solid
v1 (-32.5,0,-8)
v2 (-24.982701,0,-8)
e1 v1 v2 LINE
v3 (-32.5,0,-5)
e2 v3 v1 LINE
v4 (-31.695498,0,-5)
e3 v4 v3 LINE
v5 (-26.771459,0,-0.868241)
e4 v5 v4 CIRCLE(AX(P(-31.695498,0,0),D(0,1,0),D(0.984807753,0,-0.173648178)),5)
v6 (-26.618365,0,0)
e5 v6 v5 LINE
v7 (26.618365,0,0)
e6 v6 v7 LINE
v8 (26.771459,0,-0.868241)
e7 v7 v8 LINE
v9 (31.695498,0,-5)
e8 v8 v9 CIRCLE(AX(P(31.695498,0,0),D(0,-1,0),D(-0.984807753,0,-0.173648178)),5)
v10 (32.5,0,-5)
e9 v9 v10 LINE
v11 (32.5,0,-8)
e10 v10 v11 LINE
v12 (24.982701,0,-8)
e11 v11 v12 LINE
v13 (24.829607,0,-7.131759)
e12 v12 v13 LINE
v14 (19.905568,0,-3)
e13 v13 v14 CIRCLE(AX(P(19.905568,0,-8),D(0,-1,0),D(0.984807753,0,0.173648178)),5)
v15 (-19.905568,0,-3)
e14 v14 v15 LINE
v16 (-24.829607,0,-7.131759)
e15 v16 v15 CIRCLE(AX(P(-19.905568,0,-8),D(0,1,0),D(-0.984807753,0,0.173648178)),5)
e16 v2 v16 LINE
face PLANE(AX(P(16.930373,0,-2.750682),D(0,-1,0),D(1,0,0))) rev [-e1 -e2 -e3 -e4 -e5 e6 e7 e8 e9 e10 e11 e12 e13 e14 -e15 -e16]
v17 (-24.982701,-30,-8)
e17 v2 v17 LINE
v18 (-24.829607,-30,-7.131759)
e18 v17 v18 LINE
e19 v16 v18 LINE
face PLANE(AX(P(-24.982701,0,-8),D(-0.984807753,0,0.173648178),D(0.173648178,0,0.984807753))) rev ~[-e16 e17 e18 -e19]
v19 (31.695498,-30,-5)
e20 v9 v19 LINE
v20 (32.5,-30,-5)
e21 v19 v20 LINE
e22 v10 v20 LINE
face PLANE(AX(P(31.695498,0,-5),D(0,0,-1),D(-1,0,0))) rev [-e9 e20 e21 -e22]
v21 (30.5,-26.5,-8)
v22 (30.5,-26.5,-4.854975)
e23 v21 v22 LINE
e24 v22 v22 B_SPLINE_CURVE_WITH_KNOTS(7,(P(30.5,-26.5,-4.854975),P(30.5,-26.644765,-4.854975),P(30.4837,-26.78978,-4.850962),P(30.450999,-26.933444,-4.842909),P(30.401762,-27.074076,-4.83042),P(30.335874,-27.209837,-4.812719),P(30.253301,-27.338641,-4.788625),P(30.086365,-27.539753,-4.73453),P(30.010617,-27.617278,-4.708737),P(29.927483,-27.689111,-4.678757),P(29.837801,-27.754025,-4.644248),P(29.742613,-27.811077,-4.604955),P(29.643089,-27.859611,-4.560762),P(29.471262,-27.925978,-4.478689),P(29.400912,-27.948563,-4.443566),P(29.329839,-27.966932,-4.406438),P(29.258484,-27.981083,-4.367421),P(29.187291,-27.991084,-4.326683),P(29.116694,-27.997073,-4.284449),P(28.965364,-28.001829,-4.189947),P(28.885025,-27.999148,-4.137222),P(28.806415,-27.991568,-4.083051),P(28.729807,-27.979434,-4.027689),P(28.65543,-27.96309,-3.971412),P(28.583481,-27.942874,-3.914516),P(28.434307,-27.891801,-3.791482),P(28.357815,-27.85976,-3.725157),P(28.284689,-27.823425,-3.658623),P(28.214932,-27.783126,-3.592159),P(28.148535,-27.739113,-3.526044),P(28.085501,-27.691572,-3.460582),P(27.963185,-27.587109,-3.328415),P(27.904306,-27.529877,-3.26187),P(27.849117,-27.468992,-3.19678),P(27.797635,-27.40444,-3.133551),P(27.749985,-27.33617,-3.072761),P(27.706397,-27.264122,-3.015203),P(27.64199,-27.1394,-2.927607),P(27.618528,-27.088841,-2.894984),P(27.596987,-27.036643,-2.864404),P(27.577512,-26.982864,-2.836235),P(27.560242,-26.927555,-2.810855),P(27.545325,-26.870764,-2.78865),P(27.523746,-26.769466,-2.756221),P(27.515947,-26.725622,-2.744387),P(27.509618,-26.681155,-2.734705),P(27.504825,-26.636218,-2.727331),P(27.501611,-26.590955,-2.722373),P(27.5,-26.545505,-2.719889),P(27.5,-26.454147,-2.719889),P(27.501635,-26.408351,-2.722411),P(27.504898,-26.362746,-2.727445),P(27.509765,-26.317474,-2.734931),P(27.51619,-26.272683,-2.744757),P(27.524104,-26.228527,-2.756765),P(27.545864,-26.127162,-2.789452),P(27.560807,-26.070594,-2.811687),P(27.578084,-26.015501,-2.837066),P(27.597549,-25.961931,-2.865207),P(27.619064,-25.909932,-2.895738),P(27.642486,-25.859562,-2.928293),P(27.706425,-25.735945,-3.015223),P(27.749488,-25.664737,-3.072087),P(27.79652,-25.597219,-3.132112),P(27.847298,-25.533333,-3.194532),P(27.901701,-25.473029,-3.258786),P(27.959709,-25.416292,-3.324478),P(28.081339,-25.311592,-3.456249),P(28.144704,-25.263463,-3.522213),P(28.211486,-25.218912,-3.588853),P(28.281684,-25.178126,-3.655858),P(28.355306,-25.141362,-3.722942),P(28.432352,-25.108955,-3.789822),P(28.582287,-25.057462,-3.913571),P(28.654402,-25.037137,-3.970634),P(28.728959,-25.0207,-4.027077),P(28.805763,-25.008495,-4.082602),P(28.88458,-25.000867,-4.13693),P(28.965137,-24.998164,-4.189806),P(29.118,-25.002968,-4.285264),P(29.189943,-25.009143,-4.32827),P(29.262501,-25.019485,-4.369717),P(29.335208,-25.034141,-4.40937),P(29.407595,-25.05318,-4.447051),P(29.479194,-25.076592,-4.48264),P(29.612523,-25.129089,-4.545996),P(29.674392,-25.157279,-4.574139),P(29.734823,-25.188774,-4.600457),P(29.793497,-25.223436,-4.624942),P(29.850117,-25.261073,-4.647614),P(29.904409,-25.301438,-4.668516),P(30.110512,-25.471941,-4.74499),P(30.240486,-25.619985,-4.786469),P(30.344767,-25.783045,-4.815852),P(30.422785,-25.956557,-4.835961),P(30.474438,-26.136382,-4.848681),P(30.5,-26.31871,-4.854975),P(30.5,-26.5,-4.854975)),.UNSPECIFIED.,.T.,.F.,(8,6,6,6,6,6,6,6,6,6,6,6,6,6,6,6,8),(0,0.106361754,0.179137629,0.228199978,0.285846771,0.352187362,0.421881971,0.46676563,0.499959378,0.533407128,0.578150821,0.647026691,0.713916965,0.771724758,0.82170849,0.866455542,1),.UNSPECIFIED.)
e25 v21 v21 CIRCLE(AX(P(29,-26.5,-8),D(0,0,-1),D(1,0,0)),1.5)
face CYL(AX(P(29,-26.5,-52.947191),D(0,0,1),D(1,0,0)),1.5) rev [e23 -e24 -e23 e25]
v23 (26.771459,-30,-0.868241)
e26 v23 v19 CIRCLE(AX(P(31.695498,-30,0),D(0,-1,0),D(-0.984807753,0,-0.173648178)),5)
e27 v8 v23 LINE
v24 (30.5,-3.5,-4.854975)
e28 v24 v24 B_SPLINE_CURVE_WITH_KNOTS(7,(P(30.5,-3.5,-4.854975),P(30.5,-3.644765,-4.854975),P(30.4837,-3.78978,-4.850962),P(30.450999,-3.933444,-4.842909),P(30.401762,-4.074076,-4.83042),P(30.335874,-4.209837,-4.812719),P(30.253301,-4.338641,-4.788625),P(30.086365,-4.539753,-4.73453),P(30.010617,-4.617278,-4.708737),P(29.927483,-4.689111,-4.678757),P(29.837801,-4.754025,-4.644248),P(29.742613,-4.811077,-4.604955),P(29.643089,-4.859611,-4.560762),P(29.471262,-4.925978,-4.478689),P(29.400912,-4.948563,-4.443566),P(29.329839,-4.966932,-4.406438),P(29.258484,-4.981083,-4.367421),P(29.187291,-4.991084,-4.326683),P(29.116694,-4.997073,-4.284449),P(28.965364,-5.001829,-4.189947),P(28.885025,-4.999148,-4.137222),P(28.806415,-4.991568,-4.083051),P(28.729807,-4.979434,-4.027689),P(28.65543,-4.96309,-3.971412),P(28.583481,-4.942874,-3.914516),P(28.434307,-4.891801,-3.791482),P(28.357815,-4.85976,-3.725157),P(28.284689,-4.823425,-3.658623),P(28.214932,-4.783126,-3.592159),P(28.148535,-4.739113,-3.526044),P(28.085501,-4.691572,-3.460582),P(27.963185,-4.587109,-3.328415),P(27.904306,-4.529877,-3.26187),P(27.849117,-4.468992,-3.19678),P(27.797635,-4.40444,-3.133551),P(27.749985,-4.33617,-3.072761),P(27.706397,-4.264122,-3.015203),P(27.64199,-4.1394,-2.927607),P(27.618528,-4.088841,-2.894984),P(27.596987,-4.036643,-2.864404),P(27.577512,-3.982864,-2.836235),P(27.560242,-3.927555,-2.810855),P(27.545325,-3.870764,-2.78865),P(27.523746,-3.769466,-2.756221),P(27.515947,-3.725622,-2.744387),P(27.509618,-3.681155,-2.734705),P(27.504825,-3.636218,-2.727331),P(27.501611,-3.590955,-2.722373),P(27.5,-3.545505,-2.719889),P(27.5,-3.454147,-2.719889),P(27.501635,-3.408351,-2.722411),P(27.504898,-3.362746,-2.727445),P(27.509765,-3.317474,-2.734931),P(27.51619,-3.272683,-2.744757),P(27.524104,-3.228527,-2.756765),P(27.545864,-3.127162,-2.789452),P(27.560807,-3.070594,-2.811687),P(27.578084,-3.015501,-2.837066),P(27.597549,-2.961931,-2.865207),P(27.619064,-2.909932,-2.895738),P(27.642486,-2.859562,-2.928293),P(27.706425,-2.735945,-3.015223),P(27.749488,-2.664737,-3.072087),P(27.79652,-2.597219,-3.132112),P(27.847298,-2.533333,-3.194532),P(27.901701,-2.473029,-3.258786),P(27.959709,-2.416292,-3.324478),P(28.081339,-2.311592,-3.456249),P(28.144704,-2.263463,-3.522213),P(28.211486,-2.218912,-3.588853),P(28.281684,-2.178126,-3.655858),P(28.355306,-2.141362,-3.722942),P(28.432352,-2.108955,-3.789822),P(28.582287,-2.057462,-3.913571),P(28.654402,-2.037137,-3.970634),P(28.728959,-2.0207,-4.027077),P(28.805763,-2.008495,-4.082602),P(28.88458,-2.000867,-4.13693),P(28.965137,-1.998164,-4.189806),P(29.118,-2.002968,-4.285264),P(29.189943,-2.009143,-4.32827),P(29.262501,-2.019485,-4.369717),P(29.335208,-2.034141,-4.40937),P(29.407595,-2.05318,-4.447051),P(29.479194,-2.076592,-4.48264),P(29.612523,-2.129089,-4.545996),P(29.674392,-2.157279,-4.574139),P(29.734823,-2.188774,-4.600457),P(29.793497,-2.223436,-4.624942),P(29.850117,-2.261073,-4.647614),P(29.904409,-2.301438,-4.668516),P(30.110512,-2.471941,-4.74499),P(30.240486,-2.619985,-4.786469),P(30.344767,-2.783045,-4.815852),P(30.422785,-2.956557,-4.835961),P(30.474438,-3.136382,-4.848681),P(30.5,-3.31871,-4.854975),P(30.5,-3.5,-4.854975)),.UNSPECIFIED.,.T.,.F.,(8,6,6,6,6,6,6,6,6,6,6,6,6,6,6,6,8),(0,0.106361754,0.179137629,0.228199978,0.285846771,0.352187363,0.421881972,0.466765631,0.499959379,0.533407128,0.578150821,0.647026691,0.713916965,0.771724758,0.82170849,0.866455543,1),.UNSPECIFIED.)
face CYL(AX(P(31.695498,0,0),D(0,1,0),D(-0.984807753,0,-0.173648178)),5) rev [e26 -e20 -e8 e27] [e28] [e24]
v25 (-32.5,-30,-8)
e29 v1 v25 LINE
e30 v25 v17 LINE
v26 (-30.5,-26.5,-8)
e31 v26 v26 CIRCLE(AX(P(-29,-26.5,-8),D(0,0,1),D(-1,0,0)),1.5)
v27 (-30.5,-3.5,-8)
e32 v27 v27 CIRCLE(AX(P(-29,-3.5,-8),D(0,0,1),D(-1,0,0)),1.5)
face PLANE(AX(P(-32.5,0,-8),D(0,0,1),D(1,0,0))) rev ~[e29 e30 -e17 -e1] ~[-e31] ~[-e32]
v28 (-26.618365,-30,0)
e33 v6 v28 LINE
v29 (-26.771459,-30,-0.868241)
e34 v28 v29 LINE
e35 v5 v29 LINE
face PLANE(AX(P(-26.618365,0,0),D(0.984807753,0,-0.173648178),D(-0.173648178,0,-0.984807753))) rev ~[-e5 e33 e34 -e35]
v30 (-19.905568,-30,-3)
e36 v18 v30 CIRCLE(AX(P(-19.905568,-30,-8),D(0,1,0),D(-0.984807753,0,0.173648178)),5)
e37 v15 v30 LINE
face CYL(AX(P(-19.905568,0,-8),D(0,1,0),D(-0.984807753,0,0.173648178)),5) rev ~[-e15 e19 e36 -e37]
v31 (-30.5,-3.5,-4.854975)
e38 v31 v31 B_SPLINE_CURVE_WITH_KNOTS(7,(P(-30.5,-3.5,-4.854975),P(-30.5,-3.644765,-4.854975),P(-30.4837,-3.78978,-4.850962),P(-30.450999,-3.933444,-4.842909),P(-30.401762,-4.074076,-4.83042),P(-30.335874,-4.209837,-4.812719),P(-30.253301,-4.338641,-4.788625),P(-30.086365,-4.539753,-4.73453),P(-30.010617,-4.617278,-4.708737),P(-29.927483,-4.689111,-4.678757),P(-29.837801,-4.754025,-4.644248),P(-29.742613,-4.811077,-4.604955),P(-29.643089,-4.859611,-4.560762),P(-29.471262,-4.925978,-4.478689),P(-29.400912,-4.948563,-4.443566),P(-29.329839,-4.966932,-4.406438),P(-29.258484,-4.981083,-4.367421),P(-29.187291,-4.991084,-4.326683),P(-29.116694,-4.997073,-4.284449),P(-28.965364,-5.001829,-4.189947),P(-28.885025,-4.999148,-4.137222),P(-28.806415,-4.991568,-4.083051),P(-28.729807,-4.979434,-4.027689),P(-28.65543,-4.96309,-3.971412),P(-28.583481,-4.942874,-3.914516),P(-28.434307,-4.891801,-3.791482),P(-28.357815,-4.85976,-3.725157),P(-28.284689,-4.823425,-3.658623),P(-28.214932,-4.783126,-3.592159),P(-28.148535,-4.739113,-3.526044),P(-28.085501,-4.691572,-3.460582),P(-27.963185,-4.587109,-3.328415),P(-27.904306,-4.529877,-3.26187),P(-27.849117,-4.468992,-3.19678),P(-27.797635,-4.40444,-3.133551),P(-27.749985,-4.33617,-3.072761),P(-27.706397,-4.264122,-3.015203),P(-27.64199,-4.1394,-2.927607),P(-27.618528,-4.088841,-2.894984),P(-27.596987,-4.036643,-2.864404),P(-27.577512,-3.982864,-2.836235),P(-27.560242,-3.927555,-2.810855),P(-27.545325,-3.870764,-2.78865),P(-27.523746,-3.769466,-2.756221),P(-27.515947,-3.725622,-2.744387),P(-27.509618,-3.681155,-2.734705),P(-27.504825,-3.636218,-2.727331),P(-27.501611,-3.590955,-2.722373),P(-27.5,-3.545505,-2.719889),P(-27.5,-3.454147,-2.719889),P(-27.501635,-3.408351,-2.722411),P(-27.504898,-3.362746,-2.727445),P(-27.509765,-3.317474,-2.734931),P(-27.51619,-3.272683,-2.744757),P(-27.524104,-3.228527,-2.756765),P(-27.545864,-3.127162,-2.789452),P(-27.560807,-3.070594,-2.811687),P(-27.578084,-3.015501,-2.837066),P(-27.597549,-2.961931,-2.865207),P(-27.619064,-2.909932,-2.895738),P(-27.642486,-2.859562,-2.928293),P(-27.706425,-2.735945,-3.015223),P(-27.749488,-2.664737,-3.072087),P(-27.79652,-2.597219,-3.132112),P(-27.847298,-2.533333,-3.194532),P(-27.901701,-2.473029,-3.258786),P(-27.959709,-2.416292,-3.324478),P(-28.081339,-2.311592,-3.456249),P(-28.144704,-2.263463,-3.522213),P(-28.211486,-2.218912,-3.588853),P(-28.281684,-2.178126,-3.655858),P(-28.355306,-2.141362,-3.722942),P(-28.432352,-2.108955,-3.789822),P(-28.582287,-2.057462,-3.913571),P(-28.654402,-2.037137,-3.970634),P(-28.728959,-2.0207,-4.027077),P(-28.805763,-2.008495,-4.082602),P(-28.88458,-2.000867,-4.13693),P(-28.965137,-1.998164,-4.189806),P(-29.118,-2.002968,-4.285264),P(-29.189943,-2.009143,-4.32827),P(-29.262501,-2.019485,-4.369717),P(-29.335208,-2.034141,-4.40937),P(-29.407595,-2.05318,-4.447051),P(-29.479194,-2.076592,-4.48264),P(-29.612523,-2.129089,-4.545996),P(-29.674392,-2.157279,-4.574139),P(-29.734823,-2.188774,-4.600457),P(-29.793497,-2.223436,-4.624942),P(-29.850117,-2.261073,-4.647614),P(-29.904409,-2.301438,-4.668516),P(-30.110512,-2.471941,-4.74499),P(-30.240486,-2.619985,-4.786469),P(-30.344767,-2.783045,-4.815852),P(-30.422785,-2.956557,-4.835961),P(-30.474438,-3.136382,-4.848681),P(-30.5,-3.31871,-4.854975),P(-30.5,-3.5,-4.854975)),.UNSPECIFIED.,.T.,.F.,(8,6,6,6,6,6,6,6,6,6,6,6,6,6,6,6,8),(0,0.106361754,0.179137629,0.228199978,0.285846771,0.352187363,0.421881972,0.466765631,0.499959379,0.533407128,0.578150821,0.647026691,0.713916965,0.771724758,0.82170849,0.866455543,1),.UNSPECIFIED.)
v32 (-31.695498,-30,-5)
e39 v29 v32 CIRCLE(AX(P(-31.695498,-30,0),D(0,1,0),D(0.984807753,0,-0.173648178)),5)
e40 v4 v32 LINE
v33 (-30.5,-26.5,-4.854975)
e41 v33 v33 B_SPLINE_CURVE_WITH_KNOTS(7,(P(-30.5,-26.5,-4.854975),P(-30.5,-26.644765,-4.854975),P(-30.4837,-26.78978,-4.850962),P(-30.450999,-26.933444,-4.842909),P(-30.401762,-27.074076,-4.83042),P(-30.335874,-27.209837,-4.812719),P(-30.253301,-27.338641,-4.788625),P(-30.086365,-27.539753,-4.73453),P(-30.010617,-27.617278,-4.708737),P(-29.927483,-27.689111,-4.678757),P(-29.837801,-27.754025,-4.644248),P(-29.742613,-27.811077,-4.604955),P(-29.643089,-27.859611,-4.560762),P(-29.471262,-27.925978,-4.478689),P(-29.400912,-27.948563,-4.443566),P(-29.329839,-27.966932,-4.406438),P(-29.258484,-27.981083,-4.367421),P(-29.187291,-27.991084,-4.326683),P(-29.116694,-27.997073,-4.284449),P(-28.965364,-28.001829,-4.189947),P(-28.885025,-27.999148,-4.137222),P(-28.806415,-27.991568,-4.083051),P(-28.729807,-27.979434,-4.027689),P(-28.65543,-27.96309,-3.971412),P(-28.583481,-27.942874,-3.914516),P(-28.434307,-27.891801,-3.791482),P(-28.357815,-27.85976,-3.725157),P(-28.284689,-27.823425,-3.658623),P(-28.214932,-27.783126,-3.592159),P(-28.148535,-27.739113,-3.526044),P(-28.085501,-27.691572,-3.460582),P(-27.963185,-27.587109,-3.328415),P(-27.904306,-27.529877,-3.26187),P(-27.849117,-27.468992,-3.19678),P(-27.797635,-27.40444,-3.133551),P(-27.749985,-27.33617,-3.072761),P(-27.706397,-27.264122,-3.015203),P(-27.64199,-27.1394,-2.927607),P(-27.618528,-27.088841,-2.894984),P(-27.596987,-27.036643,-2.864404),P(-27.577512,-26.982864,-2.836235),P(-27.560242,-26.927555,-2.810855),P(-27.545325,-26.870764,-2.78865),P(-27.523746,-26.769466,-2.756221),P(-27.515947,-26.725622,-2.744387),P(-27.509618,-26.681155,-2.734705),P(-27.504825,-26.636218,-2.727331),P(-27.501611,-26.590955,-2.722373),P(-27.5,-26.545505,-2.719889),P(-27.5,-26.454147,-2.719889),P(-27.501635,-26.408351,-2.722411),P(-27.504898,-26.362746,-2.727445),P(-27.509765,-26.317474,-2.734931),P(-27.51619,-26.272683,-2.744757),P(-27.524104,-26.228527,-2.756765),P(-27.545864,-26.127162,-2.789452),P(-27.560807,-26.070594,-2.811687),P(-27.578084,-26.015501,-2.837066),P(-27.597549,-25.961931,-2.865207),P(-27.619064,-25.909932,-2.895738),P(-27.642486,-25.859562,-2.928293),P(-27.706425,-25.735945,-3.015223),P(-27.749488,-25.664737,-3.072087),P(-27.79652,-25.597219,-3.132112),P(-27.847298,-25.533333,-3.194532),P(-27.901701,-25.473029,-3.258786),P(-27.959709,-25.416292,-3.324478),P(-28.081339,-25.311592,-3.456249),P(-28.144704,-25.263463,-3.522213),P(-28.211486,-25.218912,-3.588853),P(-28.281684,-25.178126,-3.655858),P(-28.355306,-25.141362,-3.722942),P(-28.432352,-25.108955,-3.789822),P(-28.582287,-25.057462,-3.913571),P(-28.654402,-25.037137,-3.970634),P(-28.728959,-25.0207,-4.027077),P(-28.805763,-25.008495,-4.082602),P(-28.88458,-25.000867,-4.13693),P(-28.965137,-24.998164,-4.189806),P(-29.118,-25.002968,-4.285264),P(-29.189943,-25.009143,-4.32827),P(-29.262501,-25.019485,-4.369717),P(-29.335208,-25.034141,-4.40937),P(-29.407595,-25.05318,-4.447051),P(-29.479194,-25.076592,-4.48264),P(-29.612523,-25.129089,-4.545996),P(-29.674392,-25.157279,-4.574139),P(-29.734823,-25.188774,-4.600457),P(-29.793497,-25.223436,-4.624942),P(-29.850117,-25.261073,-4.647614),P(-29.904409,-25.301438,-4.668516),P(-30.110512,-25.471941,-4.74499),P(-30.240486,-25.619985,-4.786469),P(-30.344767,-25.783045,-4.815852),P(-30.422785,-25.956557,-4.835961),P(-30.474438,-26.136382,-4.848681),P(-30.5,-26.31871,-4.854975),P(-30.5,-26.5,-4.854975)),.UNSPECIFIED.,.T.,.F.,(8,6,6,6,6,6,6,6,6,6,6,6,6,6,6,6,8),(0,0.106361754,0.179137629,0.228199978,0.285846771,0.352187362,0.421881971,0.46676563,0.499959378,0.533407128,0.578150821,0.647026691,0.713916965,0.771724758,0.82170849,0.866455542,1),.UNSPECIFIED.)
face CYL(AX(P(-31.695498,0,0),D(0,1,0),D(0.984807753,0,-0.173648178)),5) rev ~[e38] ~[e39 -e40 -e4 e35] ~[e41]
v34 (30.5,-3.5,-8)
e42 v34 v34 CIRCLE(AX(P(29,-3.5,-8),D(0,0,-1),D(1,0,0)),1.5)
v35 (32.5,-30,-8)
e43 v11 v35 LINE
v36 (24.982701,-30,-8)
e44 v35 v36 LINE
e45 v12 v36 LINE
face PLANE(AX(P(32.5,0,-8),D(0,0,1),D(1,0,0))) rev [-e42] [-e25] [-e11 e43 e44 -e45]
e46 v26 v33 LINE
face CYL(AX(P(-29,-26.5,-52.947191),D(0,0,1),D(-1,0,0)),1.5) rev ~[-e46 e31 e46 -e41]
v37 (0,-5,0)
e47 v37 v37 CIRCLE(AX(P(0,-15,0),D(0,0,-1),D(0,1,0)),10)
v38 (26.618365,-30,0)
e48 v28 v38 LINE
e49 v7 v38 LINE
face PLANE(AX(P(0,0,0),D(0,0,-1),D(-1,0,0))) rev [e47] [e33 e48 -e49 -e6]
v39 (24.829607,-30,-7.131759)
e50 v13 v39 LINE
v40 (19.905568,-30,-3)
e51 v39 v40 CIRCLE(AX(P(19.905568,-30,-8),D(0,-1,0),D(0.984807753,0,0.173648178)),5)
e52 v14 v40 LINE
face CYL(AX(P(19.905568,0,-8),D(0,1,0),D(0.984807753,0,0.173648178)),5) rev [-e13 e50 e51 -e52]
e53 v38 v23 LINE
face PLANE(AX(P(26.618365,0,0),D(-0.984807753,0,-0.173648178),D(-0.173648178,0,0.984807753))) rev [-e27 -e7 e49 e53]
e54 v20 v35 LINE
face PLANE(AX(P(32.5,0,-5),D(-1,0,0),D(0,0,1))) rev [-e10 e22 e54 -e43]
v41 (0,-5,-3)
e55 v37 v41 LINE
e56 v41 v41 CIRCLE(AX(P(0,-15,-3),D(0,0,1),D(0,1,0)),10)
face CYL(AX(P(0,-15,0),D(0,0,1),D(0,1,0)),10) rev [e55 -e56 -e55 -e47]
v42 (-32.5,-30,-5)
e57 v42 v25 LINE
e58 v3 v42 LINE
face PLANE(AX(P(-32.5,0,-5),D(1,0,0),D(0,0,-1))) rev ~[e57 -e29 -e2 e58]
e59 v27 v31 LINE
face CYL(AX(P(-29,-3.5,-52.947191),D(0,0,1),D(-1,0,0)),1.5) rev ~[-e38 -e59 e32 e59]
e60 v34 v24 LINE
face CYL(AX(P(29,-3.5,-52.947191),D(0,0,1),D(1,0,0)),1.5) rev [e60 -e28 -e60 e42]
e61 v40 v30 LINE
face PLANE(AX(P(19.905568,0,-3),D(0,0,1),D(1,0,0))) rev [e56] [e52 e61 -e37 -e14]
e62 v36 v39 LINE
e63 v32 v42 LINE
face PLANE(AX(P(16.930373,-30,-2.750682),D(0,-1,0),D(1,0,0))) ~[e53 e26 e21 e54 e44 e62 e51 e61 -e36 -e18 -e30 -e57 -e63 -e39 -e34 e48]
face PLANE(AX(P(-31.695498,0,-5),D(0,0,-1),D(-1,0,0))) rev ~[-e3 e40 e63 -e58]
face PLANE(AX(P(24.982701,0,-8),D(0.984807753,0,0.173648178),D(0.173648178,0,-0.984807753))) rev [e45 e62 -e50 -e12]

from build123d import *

# Parameters (mm, degrees)
F1_DEPTH = 30
F3_DEPTH = 8.001
F5_D     = 3


with BuildPart() as f1:
    # F0 (on Front) → F1 (new body)
    with BuildSketch(Plane.XZ):
        with BuildLine():
            Line((0, -3), (0, 0))
            Line((0, 0), (-26.6183650965, 0))
            Line((-26.6183650965, 0), (-26.7714593908, -0.8682408883))
            ThreePointArc((-26.7714593908, -0.8682408883), (-28.4815601075, -3.8302222156), (-31.6954981559, -5))
            Line((-31.6954981559, -5), (-32.5, -5))
            Line((-32.5, -5), (-32.5, -8))
            Line((-32.5, -8), (-24.9827011065, -8))
            Line((-24.9827011065, -8), (-24.8296068121, -7.1317591117))
            ThreePointArc((-24.8296068121, -7.1317591117), (-23.1195060955, -4.1697777844), (-19.905568047, -3))
            Line((-19.905568047, -3), (0, -3))
        make_face()
    extrude(amount=F1_DEPTH)

    # F2 (on face) → F3 (cut, through all)
    with BuildSketch(Plane.XY):
        with BuildLine():
            Line((0, -25), (0, -5))
            ThreePointArc((0, -5), (-10, -15), (0, -25))
        make_face()
        with BuildLine():
            ThreePointArc((0, -25), (7.0710678119, -22.0710678119), (10, -15))
            ThreePointArc((10, -15), (7.0710678119, -7.9289321881), (0, -5))
            Line((0, -5), (0, -25))
        make_face()
    extrude(amount=-F3_DEPTH, mode=Mode.SUBTRACT)

    # F5 (through all)
    with Locations(Plane(origin=(0, 0, -8), x_dir=(1, 0, 0), z_dir=(0, 0, -1))):
        with Locations((-29, 26.5), (-29, 3.5)):
            Hole(F5_D / 2)

    # F6: F1 across plane


with BuildPart() as f1_1:
    add(f1.part)
    add(f1.part.mirror(Plane.YZ))


solid = f1_1.part
